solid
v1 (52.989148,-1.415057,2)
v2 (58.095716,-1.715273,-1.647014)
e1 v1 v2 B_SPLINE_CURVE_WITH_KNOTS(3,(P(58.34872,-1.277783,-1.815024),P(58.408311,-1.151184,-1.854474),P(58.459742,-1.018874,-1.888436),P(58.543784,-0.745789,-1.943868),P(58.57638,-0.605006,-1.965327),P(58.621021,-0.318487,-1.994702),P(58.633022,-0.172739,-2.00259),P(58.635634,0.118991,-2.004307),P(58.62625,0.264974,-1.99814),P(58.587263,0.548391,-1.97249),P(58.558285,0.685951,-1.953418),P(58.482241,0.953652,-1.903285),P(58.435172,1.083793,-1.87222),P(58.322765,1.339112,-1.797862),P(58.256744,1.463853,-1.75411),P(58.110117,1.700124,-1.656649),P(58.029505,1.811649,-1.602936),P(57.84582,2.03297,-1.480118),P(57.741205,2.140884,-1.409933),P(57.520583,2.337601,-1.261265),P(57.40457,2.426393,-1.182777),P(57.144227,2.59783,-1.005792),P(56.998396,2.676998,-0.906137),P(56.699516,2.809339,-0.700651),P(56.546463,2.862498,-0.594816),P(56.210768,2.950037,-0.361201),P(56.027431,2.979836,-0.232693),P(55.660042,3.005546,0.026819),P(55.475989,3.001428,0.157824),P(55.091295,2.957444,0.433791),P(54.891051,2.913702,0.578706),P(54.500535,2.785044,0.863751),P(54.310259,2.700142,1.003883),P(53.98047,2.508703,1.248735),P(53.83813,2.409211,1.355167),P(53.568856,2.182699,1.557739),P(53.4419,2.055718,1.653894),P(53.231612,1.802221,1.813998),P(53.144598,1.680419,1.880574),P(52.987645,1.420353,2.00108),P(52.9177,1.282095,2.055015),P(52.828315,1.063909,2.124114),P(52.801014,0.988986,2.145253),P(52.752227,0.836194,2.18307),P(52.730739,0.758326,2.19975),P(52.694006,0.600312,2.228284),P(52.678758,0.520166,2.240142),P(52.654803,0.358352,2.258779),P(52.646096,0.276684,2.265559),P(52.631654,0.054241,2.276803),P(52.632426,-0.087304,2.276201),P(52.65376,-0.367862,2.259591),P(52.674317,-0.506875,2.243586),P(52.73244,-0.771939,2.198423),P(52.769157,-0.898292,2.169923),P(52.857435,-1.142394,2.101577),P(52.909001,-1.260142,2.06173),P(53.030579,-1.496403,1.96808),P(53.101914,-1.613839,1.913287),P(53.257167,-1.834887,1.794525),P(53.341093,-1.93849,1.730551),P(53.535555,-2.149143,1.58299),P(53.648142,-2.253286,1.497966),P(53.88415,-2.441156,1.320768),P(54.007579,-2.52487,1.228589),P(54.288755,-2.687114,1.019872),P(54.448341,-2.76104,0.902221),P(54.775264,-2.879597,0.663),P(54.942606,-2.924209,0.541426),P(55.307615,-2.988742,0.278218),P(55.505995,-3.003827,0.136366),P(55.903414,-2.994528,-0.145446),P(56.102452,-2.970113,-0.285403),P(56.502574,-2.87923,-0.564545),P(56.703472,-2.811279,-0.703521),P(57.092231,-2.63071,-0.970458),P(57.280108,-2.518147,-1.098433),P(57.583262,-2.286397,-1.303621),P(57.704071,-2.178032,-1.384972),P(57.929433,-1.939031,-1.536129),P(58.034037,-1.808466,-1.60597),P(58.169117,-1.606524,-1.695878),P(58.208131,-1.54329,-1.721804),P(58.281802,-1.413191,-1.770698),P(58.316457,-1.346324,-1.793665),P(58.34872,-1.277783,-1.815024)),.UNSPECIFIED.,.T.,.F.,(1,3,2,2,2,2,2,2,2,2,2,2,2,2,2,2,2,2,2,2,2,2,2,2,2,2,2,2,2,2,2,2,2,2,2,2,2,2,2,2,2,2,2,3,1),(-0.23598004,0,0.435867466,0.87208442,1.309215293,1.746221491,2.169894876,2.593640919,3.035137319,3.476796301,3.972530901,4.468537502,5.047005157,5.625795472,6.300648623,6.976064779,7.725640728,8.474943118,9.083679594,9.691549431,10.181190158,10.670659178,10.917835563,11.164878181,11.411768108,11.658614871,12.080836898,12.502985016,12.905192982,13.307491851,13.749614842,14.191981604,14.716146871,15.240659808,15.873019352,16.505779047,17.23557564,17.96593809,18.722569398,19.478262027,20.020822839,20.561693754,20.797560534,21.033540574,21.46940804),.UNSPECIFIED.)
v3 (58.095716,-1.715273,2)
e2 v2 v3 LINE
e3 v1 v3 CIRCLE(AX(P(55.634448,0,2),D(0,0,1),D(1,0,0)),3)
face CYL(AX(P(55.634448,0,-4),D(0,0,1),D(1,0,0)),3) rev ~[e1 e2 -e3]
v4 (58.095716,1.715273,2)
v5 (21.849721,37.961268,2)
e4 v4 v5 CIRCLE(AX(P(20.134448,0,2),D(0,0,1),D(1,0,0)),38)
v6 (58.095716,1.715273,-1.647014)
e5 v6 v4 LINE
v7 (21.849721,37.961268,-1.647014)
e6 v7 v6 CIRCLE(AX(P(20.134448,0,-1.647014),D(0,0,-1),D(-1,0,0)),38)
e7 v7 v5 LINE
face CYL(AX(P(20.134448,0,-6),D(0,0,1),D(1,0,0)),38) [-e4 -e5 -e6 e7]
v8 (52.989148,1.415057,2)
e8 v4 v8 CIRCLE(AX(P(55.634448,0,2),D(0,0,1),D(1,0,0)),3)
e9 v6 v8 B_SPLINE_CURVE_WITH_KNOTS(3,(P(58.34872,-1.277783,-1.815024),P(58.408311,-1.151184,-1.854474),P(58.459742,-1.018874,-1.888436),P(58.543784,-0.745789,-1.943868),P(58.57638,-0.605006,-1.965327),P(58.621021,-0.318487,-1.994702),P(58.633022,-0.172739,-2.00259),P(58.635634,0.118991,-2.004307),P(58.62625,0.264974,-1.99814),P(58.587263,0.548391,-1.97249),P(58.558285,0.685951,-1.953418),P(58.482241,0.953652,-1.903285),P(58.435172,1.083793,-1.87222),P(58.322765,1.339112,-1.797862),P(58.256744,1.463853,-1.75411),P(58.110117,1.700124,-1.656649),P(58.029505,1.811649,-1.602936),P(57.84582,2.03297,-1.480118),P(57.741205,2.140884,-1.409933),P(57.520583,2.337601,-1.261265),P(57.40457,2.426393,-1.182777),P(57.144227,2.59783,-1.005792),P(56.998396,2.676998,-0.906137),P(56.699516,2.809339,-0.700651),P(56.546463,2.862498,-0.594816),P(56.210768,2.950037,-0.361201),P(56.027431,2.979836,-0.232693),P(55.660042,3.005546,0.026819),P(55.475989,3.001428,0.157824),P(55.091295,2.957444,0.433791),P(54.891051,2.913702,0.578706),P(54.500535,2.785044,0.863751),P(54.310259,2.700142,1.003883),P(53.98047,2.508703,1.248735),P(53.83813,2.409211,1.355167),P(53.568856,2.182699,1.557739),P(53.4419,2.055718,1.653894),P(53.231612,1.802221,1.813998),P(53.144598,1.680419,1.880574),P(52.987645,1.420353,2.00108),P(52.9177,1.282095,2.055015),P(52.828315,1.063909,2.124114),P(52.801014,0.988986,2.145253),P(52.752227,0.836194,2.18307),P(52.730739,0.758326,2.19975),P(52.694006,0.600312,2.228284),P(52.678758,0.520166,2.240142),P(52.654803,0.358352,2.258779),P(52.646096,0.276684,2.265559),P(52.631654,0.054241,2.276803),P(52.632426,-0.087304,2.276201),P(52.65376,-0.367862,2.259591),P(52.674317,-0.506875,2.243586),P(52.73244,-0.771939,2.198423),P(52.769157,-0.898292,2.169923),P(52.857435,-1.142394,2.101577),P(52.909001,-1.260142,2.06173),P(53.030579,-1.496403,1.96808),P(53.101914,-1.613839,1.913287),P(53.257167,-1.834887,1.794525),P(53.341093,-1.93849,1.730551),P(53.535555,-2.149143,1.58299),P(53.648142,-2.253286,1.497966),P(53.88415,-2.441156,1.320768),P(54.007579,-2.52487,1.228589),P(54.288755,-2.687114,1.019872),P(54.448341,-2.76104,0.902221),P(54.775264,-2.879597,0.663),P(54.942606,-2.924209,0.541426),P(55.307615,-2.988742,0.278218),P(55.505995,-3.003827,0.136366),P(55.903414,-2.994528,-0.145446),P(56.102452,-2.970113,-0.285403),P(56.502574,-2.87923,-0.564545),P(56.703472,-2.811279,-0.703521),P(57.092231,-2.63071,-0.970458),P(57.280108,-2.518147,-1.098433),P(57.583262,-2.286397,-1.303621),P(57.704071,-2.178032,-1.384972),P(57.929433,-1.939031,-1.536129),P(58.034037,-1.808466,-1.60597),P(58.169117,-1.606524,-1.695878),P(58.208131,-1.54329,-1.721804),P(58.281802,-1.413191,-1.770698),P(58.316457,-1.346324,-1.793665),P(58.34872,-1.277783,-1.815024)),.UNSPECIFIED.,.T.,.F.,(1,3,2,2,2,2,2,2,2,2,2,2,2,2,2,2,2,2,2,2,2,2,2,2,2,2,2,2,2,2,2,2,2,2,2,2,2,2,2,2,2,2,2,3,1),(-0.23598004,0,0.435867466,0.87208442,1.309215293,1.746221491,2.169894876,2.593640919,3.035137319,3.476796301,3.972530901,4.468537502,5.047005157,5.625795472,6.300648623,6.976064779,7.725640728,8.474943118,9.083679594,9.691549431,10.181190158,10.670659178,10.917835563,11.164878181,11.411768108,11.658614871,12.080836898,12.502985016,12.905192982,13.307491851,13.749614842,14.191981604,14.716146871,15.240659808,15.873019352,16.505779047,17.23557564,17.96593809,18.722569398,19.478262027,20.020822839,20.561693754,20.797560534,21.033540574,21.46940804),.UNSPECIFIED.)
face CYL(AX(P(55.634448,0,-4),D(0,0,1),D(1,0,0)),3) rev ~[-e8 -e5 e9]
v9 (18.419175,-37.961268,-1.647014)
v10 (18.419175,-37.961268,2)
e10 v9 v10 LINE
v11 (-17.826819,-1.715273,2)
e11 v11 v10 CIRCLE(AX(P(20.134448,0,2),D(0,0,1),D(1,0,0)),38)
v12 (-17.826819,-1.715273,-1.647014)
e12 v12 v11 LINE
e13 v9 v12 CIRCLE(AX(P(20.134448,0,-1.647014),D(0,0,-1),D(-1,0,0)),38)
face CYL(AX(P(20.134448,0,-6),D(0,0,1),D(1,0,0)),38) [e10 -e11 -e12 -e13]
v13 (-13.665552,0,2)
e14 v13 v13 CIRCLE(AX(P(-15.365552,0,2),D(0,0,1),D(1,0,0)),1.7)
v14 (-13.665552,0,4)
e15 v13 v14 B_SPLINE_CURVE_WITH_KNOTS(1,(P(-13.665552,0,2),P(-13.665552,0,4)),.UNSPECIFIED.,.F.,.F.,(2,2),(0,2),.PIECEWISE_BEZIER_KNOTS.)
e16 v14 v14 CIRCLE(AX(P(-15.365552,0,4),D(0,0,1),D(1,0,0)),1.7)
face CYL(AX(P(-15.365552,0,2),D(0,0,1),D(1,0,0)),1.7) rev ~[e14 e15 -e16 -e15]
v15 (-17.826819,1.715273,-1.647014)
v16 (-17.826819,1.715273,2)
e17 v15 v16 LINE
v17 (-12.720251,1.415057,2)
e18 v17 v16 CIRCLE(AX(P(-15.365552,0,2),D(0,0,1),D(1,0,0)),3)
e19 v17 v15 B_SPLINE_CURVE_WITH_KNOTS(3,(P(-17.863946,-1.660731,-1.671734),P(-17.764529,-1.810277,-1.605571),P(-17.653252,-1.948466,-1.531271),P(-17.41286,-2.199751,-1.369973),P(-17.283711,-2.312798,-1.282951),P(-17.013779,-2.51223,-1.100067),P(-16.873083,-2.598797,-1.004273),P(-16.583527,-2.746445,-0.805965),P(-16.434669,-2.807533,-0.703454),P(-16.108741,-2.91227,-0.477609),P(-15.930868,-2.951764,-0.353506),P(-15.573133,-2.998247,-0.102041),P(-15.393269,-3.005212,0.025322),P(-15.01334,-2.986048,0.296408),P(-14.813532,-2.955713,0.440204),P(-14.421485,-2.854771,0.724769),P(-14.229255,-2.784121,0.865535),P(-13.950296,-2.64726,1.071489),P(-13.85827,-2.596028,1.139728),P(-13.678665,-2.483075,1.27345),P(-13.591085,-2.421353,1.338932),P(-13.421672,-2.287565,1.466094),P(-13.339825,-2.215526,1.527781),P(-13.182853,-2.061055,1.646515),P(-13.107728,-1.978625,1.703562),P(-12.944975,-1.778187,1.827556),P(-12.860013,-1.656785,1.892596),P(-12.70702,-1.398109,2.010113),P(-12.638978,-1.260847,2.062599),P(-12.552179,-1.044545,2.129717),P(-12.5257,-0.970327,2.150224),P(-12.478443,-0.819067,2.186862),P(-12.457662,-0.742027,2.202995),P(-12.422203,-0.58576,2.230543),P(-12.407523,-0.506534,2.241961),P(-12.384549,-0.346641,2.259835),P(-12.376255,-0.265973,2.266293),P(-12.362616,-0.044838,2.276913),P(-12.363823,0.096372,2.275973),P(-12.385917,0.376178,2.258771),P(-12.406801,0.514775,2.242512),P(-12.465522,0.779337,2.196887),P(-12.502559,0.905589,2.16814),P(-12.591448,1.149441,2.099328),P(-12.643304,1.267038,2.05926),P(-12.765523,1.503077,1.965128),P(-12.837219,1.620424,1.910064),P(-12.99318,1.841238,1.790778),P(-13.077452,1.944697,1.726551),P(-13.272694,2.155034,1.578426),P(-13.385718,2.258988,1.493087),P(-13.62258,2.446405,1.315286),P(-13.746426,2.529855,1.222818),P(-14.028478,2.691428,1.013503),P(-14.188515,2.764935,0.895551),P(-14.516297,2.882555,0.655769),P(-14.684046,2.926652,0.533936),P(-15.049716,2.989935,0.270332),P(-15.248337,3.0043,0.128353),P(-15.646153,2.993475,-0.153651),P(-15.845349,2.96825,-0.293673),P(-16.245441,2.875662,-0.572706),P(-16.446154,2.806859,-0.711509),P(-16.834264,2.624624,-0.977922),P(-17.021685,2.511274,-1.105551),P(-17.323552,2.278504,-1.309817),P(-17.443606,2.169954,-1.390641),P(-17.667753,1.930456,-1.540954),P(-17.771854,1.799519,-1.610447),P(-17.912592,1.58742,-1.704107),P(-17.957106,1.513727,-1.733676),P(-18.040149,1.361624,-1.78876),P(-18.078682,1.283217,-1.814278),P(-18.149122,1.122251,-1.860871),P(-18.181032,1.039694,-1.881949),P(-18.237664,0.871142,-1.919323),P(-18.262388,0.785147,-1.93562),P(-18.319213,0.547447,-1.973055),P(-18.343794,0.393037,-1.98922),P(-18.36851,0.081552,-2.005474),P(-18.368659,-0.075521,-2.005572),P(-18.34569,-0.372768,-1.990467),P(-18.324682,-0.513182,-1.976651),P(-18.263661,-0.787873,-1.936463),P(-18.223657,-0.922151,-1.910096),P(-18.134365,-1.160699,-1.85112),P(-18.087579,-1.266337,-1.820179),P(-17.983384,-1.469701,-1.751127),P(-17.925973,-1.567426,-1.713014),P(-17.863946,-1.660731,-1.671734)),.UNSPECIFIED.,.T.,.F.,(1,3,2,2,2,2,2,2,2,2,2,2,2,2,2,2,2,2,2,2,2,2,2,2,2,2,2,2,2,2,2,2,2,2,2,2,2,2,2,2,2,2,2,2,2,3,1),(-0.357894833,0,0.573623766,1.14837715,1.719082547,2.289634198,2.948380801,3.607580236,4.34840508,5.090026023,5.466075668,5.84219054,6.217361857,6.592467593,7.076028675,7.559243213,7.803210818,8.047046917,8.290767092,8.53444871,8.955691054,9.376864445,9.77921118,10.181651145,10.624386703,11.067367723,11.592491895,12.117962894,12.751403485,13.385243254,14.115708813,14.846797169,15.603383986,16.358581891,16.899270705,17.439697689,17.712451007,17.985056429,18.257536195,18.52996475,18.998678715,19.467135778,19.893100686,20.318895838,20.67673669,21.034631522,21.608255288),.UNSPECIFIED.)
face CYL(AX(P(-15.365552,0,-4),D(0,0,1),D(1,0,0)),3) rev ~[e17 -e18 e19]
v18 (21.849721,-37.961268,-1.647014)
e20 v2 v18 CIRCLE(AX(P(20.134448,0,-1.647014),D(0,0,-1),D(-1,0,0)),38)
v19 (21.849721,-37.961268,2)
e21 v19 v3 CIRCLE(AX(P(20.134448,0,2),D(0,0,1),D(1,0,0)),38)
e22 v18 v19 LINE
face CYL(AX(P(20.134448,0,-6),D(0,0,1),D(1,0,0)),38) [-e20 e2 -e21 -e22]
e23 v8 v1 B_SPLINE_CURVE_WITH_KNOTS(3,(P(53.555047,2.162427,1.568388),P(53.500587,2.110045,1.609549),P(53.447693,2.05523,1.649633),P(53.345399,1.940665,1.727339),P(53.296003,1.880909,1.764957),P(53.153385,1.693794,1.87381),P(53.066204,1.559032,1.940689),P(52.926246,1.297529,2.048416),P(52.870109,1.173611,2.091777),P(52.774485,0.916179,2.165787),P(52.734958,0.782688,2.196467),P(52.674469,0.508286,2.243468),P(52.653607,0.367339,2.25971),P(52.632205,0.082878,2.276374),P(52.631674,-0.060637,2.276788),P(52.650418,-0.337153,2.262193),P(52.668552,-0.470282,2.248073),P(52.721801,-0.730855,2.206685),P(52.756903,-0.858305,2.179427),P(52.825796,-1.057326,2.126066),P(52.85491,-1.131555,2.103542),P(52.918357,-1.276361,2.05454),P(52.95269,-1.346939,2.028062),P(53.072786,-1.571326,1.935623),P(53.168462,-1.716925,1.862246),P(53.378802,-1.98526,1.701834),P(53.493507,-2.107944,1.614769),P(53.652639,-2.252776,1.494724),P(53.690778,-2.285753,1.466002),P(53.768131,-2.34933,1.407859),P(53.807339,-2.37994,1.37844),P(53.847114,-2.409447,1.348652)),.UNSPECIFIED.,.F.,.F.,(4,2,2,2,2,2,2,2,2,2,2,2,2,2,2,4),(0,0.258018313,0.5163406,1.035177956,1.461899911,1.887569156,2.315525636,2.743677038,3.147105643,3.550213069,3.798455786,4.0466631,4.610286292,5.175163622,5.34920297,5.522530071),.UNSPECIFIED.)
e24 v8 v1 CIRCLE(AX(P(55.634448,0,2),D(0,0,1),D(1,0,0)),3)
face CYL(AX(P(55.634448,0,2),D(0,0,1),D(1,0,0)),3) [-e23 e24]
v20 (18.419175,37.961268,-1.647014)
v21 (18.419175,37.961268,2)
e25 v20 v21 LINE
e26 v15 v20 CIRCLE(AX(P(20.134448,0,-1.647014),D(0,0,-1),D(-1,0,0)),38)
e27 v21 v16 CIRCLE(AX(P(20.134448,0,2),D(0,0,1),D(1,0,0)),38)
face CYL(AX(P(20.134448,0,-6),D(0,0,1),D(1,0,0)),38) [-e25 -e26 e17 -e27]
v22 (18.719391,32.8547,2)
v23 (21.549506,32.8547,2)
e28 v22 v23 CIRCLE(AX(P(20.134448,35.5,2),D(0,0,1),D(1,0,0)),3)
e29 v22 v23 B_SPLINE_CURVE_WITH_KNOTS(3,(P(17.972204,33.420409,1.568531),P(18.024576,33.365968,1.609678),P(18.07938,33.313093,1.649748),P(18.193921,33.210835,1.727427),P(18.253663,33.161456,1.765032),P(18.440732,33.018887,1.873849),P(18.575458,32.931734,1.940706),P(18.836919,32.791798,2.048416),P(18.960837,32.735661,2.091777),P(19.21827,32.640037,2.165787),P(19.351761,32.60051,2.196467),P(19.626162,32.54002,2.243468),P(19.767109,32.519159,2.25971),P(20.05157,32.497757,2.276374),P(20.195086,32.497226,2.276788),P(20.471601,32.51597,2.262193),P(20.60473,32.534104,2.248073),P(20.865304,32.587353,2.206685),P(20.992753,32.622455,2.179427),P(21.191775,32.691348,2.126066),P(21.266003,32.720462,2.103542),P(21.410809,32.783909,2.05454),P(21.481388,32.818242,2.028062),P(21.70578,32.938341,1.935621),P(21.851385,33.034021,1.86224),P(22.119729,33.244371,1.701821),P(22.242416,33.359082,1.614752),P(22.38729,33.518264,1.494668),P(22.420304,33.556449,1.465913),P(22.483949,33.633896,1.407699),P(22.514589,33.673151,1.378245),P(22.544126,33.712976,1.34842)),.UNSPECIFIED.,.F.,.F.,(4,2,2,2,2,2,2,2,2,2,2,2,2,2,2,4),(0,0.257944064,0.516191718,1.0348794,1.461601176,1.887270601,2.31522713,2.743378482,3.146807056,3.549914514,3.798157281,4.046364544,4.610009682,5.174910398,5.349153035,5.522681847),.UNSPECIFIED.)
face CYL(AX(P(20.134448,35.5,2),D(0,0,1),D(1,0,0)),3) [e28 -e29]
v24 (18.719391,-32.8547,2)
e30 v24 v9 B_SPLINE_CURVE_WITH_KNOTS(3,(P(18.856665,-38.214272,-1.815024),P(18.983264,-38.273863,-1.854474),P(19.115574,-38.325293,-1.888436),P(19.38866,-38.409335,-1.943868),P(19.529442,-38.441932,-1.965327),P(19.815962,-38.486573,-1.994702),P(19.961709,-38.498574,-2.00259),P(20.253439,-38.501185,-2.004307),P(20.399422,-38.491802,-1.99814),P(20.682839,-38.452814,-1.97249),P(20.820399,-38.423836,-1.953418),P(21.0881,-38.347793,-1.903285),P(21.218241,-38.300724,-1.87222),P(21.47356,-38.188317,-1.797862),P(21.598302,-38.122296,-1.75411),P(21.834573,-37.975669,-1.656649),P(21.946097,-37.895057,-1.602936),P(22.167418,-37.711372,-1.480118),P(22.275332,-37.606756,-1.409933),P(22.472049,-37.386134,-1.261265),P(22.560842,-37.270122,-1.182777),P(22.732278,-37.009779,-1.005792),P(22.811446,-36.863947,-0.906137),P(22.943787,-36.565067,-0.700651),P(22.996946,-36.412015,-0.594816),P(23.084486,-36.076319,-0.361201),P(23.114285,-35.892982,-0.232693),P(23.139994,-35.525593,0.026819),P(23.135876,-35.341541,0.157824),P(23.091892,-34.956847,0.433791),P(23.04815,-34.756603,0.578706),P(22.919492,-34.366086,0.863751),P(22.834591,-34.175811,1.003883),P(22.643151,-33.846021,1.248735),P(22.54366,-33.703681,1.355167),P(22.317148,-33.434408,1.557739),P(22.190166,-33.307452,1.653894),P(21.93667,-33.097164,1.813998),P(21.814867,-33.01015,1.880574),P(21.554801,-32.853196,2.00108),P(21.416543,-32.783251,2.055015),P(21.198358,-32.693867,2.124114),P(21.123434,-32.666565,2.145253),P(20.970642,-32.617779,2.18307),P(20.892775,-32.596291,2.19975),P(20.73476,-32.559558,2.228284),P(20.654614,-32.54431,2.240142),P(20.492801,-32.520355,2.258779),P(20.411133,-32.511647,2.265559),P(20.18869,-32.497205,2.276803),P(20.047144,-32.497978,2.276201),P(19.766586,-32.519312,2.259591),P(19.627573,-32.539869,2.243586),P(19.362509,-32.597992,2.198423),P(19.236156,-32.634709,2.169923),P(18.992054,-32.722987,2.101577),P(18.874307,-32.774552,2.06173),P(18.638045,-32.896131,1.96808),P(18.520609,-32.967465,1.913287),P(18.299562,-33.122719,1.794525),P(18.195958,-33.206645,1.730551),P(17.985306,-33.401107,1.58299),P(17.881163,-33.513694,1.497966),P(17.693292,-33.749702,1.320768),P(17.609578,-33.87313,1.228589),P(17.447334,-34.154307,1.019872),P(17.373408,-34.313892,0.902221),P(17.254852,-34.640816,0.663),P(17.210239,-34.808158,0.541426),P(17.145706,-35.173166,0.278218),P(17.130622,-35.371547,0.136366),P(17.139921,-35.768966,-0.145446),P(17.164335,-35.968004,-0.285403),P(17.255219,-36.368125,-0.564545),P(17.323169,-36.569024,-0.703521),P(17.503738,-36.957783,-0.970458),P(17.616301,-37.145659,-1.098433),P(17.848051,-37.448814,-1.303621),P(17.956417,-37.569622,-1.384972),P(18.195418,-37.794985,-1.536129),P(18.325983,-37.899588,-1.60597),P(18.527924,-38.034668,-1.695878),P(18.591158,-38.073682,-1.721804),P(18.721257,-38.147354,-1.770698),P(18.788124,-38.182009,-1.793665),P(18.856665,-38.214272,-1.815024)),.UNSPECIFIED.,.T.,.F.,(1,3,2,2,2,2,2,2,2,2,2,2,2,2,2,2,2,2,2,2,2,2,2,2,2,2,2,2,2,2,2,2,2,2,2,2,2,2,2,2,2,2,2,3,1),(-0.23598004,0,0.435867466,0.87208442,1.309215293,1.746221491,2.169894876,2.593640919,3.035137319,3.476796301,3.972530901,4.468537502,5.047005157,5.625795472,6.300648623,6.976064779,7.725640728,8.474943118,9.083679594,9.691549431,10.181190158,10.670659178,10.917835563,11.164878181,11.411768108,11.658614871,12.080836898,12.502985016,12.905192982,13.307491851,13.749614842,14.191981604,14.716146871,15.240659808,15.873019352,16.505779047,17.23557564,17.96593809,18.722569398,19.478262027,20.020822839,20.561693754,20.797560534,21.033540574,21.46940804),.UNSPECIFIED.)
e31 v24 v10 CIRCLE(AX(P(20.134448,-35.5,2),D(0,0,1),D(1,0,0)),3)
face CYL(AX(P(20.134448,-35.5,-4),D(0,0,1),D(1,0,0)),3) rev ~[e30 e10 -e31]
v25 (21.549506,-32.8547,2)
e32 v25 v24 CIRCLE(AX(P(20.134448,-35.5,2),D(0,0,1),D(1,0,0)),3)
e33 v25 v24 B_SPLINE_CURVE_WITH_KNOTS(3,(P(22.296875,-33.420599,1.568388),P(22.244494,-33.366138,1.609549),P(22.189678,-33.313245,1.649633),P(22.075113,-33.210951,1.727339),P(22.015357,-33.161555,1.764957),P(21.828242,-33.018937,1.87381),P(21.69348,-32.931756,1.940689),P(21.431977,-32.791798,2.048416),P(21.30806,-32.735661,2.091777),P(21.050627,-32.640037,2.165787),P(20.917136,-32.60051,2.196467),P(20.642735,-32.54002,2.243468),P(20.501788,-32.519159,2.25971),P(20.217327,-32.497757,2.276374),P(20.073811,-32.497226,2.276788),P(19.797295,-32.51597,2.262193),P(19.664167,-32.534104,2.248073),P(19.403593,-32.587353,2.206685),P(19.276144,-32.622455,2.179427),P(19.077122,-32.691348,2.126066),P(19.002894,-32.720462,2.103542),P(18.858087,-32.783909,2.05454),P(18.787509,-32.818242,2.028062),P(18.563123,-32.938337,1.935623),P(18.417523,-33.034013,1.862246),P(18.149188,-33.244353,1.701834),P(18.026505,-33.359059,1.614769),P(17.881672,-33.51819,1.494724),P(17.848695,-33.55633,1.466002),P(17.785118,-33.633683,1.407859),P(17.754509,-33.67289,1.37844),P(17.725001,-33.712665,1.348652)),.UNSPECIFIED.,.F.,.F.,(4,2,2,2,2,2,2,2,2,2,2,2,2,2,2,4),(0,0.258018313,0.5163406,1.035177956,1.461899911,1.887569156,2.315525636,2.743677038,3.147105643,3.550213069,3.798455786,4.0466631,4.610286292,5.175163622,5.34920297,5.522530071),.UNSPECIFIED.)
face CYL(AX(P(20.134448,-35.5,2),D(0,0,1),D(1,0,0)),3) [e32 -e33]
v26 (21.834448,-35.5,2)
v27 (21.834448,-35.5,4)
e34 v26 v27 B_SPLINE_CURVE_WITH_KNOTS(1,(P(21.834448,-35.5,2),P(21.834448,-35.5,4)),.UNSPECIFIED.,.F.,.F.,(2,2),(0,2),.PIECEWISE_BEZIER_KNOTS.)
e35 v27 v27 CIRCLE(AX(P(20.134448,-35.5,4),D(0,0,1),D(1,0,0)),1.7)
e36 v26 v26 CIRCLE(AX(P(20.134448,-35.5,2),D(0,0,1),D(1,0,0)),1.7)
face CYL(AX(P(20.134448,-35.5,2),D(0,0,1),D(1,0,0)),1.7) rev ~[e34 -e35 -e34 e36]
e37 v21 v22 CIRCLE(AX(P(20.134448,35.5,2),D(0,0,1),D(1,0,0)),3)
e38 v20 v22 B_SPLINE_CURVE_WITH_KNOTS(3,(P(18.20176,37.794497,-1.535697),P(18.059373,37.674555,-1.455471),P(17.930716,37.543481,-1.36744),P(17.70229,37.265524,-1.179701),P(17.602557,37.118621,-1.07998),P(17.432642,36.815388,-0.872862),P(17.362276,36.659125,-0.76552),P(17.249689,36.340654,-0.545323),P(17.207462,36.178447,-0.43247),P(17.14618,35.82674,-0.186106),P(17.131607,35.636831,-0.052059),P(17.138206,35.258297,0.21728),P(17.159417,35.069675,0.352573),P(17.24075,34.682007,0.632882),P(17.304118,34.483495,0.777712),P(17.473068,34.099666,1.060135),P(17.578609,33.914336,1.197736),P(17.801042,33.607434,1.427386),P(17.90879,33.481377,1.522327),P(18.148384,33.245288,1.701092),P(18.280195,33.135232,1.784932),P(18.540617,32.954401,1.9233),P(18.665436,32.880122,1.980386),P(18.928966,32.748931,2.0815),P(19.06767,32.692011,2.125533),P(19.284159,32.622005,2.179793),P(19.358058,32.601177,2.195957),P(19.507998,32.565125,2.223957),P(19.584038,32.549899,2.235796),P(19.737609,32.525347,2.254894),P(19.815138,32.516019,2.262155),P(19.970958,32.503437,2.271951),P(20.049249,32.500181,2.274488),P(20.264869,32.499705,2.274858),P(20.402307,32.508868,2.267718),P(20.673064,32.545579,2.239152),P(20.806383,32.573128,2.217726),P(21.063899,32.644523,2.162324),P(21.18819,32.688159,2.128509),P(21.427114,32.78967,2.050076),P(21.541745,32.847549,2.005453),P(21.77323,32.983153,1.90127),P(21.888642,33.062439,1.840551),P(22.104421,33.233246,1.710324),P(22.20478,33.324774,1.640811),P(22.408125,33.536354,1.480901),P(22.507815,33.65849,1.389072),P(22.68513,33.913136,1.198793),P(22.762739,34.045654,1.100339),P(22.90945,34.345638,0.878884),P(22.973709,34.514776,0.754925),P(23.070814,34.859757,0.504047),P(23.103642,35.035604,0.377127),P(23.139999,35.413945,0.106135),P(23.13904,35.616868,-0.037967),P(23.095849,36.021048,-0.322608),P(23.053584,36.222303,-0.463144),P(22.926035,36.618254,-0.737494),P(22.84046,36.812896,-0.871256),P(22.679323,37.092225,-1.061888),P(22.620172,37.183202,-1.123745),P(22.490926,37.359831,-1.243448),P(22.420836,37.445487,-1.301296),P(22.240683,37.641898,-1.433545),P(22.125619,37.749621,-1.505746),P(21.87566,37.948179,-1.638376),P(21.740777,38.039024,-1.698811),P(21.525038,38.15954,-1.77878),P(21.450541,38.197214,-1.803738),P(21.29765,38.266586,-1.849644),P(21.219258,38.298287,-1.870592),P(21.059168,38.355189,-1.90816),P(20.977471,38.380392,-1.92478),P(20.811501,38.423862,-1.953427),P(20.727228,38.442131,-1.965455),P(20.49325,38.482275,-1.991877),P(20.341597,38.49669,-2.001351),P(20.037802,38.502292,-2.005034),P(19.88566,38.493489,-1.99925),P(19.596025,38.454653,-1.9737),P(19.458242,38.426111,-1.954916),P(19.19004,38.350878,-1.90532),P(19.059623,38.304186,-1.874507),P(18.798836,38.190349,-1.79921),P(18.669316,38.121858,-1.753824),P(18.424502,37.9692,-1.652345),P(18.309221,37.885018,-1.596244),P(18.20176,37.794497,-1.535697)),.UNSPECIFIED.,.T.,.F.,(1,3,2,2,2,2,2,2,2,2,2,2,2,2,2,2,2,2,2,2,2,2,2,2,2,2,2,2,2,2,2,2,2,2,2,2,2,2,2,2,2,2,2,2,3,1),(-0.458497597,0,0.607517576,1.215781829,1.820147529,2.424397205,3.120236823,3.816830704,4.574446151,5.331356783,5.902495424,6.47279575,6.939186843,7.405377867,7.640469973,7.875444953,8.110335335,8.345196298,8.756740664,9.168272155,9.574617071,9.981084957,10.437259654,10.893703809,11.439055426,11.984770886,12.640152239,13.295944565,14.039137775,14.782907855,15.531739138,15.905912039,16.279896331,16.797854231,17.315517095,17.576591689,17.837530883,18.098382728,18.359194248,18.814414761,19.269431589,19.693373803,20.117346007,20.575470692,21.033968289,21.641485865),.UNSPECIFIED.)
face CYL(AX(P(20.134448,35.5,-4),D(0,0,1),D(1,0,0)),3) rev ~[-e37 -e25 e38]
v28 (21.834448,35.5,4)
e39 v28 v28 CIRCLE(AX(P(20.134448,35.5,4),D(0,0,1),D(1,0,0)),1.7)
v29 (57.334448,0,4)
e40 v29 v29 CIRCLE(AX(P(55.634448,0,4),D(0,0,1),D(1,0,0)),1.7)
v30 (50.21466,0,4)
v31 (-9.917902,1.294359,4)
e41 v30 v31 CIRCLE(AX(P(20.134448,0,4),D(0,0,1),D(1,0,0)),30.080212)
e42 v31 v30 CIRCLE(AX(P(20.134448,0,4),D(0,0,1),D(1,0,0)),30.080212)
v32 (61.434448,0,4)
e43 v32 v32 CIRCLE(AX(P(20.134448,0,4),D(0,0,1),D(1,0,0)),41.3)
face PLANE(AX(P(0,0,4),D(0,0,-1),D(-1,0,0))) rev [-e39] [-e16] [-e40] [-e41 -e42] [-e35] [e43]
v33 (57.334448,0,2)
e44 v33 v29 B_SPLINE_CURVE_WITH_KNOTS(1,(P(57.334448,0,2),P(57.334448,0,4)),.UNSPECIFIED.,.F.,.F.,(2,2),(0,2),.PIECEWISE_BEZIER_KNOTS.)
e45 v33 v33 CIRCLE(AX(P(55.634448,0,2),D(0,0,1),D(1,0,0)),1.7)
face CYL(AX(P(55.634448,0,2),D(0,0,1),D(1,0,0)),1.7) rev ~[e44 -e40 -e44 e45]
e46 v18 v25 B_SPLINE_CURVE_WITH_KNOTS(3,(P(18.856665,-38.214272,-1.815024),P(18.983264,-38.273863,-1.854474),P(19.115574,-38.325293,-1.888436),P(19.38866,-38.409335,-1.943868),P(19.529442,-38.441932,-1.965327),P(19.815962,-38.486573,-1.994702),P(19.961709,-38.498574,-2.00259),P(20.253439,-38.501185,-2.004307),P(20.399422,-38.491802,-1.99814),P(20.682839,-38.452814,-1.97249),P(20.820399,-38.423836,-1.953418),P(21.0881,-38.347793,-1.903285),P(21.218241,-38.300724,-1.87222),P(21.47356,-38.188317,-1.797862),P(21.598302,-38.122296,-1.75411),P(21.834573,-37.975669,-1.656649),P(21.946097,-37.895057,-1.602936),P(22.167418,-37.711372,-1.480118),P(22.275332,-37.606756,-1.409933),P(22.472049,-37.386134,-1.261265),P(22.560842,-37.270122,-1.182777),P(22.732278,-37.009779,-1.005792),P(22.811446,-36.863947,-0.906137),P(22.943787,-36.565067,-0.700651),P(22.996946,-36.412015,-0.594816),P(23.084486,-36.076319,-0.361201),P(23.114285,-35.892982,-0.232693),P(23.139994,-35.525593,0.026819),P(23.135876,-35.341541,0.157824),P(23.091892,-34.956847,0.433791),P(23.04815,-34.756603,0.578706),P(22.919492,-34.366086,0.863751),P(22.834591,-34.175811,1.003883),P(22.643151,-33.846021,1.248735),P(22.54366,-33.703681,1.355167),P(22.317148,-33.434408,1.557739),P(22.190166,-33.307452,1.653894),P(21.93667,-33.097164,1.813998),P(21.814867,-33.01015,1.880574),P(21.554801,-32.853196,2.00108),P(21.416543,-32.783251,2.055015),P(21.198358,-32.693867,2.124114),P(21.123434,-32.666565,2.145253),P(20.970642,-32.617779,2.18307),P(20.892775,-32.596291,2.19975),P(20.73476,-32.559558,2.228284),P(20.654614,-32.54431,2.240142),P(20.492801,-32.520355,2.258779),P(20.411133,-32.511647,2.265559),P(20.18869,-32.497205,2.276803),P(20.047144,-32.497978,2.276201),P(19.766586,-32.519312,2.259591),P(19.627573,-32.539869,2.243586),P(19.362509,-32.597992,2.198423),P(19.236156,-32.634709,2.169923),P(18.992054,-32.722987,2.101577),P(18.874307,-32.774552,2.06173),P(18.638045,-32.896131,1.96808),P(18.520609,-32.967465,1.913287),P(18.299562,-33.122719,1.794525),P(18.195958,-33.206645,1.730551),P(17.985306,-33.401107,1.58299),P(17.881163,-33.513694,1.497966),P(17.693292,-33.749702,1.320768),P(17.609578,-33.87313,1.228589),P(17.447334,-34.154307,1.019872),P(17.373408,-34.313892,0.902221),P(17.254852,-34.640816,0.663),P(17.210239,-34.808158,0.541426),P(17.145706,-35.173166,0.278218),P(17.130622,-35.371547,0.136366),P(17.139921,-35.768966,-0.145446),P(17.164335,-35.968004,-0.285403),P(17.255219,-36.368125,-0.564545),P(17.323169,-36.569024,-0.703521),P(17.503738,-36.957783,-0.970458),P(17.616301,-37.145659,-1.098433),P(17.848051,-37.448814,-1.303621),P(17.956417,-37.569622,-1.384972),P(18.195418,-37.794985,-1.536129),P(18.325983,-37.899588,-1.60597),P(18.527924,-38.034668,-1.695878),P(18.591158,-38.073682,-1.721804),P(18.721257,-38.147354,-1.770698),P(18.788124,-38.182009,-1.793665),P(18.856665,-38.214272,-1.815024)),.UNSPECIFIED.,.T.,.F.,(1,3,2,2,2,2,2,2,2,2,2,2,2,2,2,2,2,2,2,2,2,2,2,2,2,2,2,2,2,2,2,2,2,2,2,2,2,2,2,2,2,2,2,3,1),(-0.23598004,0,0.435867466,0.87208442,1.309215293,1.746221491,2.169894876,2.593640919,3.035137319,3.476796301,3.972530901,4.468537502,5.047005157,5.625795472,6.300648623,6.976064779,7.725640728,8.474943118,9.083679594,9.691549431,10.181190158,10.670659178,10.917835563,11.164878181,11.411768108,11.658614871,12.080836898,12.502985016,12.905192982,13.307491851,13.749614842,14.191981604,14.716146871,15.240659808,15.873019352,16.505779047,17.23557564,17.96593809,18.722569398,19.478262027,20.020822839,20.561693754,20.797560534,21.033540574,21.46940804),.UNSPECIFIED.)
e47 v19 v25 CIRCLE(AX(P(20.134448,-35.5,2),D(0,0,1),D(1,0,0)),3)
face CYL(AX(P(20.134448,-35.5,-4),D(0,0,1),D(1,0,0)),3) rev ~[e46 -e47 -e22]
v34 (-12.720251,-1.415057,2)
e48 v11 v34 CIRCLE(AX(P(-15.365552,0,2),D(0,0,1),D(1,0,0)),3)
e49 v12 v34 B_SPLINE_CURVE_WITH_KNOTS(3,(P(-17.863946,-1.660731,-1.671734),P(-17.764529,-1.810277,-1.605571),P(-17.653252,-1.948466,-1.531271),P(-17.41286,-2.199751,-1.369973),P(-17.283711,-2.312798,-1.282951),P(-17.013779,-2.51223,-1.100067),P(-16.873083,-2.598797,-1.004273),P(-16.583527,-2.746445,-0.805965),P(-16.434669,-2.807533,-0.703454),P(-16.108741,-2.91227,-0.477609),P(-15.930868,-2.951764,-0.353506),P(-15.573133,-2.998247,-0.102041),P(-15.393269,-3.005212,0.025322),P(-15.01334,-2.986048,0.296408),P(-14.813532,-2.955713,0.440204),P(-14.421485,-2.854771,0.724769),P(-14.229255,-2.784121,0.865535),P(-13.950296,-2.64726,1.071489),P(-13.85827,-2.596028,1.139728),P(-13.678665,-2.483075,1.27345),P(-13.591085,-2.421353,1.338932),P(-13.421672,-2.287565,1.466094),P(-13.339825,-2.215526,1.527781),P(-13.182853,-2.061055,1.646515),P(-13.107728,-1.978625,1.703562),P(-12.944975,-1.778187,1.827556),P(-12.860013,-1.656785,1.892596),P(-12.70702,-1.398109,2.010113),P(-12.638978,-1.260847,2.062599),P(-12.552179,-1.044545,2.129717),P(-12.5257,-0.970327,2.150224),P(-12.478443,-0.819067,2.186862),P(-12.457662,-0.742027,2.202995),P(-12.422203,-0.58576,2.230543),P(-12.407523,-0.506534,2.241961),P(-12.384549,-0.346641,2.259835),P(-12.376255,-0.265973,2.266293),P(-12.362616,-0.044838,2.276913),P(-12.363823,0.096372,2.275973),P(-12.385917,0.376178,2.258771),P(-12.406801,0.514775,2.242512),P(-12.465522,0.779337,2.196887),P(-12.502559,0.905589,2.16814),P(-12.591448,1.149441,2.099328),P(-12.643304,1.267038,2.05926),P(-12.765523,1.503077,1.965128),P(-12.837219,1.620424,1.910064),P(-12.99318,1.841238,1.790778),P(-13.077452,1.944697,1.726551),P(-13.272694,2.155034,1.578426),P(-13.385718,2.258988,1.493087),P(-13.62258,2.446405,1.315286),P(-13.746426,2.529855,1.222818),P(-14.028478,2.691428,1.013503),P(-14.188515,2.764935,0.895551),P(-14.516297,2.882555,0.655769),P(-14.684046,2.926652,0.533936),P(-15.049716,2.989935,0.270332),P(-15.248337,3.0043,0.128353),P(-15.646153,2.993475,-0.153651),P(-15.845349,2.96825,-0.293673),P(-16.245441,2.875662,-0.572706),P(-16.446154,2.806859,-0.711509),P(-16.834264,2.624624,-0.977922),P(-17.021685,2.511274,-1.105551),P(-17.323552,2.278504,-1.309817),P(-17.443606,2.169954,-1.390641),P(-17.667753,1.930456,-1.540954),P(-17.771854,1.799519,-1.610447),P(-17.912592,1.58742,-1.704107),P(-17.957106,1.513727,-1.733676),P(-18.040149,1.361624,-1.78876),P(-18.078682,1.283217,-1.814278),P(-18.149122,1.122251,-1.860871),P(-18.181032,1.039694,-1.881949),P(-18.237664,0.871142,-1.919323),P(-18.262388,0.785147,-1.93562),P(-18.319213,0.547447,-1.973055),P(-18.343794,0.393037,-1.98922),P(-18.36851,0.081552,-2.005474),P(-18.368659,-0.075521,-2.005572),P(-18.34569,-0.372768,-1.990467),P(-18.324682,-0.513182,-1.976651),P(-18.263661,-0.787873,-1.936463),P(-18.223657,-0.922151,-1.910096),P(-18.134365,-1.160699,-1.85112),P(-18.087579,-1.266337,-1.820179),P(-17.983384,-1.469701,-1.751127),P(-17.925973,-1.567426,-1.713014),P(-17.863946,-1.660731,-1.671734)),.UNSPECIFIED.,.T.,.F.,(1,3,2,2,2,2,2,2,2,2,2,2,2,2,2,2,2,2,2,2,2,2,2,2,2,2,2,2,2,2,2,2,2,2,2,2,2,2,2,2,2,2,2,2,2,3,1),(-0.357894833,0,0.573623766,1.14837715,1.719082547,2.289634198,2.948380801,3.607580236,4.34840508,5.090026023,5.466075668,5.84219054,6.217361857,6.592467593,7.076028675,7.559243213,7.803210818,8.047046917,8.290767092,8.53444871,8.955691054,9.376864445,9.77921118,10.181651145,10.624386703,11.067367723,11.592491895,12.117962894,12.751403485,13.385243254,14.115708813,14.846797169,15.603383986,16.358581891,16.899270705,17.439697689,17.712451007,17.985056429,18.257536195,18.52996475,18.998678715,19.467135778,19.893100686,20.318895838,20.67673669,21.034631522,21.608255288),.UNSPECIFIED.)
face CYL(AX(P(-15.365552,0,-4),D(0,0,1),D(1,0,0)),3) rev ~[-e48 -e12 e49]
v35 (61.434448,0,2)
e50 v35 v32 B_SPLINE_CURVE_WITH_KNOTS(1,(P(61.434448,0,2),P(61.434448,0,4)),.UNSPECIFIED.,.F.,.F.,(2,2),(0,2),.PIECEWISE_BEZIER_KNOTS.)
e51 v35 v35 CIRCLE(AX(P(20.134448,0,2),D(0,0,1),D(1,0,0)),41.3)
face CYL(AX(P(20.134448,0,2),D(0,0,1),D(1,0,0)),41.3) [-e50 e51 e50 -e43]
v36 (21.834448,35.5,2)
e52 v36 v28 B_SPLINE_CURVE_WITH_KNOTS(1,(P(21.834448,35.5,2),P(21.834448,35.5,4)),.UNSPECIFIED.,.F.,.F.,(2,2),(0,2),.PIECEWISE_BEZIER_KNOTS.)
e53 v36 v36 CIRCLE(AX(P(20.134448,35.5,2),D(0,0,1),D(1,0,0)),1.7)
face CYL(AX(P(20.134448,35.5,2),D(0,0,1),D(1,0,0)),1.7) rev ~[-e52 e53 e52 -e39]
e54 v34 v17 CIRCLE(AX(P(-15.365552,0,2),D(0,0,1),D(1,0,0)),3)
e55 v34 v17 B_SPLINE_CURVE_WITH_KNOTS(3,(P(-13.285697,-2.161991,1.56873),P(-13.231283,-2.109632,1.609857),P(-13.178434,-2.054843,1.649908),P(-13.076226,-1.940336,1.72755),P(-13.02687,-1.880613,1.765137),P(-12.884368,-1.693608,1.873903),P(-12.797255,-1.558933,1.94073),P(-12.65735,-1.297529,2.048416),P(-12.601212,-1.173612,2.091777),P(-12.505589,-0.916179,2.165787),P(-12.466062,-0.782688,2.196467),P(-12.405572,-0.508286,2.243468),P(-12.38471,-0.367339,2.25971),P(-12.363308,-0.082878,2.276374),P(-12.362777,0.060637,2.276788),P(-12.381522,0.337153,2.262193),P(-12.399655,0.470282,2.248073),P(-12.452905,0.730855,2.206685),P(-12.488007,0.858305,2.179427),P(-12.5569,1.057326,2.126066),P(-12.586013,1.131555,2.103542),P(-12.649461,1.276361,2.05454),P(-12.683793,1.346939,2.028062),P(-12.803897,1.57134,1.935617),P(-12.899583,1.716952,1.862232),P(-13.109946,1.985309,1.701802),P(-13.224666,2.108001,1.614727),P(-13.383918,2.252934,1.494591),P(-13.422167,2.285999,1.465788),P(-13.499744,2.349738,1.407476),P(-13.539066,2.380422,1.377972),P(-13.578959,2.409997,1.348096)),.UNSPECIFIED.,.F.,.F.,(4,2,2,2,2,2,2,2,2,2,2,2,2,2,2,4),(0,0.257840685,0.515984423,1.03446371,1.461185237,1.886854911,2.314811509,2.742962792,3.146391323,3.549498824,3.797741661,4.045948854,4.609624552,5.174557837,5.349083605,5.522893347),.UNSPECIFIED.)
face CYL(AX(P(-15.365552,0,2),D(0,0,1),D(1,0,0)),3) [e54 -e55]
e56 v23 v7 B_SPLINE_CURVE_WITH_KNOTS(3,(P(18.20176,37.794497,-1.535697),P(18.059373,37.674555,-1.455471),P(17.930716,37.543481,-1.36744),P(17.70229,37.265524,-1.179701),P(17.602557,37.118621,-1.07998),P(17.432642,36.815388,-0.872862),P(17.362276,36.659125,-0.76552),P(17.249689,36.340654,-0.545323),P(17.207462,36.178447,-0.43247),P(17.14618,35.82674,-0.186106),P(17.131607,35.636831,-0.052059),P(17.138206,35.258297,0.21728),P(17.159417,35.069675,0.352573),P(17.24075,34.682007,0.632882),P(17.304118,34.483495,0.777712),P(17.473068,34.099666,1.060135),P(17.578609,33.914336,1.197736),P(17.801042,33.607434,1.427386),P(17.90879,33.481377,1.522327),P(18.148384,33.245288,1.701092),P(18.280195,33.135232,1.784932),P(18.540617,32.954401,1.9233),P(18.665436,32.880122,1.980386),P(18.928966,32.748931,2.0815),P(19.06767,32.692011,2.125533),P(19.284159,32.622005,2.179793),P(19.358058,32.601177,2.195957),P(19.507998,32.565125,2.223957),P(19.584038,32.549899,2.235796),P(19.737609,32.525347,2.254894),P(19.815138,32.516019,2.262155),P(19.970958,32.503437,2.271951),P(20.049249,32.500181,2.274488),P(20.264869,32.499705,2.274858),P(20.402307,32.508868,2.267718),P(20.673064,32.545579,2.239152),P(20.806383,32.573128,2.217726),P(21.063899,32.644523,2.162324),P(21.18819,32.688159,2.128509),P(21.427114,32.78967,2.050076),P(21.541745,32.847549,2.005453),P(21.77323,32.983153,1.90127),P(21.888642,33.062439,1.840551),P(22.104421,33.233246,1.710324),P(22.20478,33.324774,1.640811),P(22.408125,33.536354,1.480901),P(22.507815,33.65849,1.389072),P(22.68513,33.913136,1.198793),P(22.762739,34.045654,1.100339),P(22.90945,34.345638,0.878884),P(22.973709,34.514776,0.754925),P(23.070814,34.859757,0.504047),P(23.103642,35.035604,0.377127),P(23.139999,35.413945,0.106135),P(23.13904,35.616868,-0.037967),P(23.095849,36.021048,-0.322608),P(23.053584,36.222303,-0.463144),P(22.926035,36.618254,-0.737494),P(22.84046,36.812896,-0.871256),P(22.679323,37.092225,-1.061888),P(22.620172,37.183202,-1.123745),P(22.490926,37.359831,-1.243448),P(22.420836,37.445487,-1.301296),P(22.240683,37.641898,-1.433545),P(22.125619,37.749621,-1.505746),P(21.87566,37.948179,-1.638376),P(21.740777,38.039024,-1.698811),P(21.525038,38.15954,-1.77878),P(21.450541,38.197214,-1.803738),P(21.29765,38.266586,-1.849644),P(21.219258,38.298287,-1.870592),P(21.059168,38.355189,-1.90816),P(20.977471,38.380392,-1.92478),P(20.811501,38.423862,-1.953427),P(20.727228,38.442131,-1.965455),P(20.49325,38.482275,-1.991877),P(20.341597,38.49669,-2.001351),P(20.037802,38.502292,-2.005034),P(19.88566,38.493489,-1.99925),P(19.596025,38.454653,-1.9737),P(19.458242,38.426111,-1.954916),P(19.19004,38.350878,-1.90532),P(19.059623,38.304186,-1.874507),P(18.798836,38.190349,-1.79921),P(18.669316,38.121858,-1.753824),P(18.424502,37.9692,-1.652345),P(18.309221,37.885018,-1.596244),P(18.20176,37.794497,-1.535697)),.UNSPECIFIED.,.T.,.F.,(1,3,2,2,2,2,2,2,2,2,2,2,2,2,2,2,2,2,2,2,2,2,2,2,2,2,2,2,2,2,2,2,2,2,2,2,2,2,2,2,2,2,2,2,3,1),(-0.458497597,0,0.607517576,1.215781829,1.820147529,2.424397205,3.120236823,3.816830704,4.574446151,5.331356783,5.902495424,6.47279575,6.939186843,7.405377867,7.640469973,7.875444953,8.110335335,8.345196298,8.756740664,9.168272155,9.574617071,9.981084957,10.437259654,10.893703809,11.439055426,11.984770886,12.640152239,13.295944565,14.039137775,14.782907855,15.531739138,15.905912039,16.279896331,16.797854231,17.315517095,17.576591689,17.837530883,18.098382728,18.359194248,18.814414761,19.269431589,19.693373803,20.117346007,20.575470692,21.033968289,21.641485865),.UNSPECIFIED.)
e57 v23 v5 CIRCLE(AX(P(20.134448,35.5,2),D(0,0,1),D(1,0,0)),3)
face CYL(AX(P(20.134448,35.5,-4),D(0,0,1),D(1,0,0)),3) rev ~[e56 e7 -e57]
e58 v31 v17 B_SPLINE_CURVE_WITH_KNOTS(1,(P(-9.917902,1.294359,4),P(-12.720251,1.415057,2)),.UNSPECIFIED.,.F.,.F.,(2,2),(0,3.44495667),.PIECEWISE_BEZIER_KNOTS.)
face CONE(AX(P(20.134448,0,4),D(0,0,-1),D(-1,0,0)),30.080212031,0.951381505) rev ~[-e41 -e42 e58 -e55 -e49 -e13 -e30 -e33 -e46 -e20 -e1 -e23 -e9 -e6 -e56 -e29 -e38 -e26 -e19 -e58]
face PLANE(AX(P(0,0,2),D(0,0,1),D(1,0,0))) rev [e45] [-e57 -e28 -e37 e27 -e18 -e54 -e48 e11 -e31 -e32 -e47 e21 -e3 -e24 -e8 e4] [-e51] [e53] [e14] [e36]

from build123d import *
from build123d.topology import SkipClean

# Parameters (mm, degrees)
SKETCH3_R           = 3
CUT_EXTRUDE1_DEPTH  = 75.457245764
SKETCH4_R           = 41.3
CUT_EXTRUDE2_DEPTH  = 10
SKETCH4_3_R         = 41.3
BOSS_EXTRUDE1_DEPTH = 2
SKETCH5_R           = 3
SKETCH5_R_2         = 1.7
BOSS_EXTRUDE2_DEPTH = 2


with BuildPart() as part:
    # Sketch2 → Revolve1 (revolve)
    with BuildSketch(Plane(origin=(0, 0, 0), x_dir=(1, 0, 0), z_dir=(0, 1, 0))):
        Polygon((-21.165551628, 4), (-21.165551628, -4), (-9.945763659, -4), align=None)
    revolve(axis=Axis((20.134448372, 0, 4), (0, 0, -1)))

    # Sketch3 → Cut-Extrude1 (cut, through all)
    with BuildSketch(Plane.XY.offset(4)):
        with Locations((20.134448372, 35.5)):
            Circle(SKETCH3_R)
        with Locations((-15.365551628, 0)):
            Circle(SKETCH3_R)
        with Locations((55.634448372, 0)):
            Circle(SKETCH3_R)
        with Locations((20.134448372, -35.5)):
            Circle(SKETCH3_R)
    extrude(amount=-CUT_EXTRUDE1_DEPTH, mode=Mode.SUBTRACT)

    # Sketch4 → Cut-Extrude2 (cut)
    with BuildSketch(Plane.XY.offset(4)):
        with Locations((20.134448372, 0)):
            Circle(SKETCH4_R)
        with BuildLine():
            ThreePointArc((21.849721462, 37.961267606), (47.004506057, 26.870057685), (58.095715978, 1.71527309))
            ThreePointArc((58.095715978, 1.71527309), (58.49659816, 0.898943041), (58.634448372, 0))
            ThreePointArc((58.634448372, 0), (58.49659816, -0.898943041), (58.095715978, -1.71527309))
            ThreePointArc((58.095715978, -1.71527309), (47.004506057, -26.870057685), (21.849721462, -37.961267606))
            ThreePointArc((21.849721462, -37.961267606), (20.134448372, -38.5), (18.419175282, -37.961267606))
            ThreePointArc((18.419175282, -37.961267606), (-6.735609313, -26.870057685), (-17.826819233, -1.71527309))
            ThreePointArc((-17.826819233, -1.71527309), (-18.365551628, 0), (-17.826819233, 1.71527309))
            ThreePointArc((-17.826819233, 1.71527309), (-6.735609313, 26.870057685), (18.419175282, 37.961267606))
            ThreePointArc((18.419175282, 37.961267606), (20.134448372, 38.5), (21.849721462, 37.961267606))
        make_face(mode=Mode.SUBTRACT)
    extrude(amount=-CUT_EXTRUDE2_DEPTH, mode=Mode.SUBTRACT)

    # Sketch4<3> → Boss-Extrude1 (add)
    with SkipClean():  # the faces are left unmerged after this step: merging them gives an invalid solid
        with BuildSketch(Plane.XY.offset(4)):
            with Locations((20.134448372, 0)):
                Circle(SKETCH4_3_R)
            with BuildLine():
                ThreePointArc((21.849721462, 37.961267606), (47.004506057, 26.870057685), (58.095715978, 1.71527309))
                ThreePointArc((58.095715978, 1.71527309), (58.49659816, 0.898943041), (58.634448372, 0))
                ThreePointArc((58.634448372, 0), (58.49659816, -0.898943041), (58.095715978, -1.71527309))
                ThreePointArc((58.095715978, -1.71527309), (47.004506057, -26.870057685), (21.849721462, -37.961267606))
                ThreePointArc((21.849721462, -37.961267606), (20.134448372, -38.5), (18.419175282, -37.961267606))
                ThreePointArc((18.419175282, -37.961267606), (-6.735609313, -26.870057685), (-17.826819233, -1.71527309))
                ThreePointArc((-17.826819233, -1.71527309), (-18.365551628, 0), (-17.826819233, 1.71527309))
                ThreePointArc((-17.826819233, 1.71527309), (-6.735609313, 26.870057685), (18.419175282, 37.961267606))
                ThreePointArc((18.419175282, 37.961267606), (20.134448372, 38.5), (21.849721462, 37.961267606))
            make_face(mode=Mode.SUBTRACT)
        extrude(amount=-BOSS_EXTRUDE1_DEPTH)

    # Sketch5 → Boss-Extrude2 (add)
    # profile 1 of 4: a face of its own
    with BuildSketch(Plane.XY.offset(4)):
        with Locations((20.134448372, -35.5)):
            Circle(SKETCH5_R)
        with Locations((20.134448372, -35.5)):
            Circle(SKETCH5_R_2, mode=Mode.SUBTRACT)
    # profile 2 of 4: a face of its own
    with BuildSketch(Plane.XY.offset(4)):
        with Locations((-15.365551628, 0)):
            Circle(SKETCH5_R)
        with Locations((-15.365551628, 0)):
            Circle(SKETCH5_R_2, mode=Mode.SUBTRACT)
    # profile 3 of 4: a face of its own
    with BuildSketch(Plane.XY.offset(4)):
        with Locations((20.134448372, 35.5)):
            Circle(SKETCH5_R)
        with Locations((20.134448372, 35.5)):
            Circle(SKETCH5_R_2, mode=Mode.SUBTRACT)
    # profile 4 of 4: a face of its own
    with BuildSketch(Plane.XY.offset(4)):
        with Locations((55.634448372, 0)):
            Circle(SKETCH5_R)
        with Locations((55.634448372, 0)):
            Circle(SKETCH5_R_2, mode=Mode.SUBTRACT)
    extrude(amount=-BOSS_EXTRUDE2_DEPTH)


solid = part.part
